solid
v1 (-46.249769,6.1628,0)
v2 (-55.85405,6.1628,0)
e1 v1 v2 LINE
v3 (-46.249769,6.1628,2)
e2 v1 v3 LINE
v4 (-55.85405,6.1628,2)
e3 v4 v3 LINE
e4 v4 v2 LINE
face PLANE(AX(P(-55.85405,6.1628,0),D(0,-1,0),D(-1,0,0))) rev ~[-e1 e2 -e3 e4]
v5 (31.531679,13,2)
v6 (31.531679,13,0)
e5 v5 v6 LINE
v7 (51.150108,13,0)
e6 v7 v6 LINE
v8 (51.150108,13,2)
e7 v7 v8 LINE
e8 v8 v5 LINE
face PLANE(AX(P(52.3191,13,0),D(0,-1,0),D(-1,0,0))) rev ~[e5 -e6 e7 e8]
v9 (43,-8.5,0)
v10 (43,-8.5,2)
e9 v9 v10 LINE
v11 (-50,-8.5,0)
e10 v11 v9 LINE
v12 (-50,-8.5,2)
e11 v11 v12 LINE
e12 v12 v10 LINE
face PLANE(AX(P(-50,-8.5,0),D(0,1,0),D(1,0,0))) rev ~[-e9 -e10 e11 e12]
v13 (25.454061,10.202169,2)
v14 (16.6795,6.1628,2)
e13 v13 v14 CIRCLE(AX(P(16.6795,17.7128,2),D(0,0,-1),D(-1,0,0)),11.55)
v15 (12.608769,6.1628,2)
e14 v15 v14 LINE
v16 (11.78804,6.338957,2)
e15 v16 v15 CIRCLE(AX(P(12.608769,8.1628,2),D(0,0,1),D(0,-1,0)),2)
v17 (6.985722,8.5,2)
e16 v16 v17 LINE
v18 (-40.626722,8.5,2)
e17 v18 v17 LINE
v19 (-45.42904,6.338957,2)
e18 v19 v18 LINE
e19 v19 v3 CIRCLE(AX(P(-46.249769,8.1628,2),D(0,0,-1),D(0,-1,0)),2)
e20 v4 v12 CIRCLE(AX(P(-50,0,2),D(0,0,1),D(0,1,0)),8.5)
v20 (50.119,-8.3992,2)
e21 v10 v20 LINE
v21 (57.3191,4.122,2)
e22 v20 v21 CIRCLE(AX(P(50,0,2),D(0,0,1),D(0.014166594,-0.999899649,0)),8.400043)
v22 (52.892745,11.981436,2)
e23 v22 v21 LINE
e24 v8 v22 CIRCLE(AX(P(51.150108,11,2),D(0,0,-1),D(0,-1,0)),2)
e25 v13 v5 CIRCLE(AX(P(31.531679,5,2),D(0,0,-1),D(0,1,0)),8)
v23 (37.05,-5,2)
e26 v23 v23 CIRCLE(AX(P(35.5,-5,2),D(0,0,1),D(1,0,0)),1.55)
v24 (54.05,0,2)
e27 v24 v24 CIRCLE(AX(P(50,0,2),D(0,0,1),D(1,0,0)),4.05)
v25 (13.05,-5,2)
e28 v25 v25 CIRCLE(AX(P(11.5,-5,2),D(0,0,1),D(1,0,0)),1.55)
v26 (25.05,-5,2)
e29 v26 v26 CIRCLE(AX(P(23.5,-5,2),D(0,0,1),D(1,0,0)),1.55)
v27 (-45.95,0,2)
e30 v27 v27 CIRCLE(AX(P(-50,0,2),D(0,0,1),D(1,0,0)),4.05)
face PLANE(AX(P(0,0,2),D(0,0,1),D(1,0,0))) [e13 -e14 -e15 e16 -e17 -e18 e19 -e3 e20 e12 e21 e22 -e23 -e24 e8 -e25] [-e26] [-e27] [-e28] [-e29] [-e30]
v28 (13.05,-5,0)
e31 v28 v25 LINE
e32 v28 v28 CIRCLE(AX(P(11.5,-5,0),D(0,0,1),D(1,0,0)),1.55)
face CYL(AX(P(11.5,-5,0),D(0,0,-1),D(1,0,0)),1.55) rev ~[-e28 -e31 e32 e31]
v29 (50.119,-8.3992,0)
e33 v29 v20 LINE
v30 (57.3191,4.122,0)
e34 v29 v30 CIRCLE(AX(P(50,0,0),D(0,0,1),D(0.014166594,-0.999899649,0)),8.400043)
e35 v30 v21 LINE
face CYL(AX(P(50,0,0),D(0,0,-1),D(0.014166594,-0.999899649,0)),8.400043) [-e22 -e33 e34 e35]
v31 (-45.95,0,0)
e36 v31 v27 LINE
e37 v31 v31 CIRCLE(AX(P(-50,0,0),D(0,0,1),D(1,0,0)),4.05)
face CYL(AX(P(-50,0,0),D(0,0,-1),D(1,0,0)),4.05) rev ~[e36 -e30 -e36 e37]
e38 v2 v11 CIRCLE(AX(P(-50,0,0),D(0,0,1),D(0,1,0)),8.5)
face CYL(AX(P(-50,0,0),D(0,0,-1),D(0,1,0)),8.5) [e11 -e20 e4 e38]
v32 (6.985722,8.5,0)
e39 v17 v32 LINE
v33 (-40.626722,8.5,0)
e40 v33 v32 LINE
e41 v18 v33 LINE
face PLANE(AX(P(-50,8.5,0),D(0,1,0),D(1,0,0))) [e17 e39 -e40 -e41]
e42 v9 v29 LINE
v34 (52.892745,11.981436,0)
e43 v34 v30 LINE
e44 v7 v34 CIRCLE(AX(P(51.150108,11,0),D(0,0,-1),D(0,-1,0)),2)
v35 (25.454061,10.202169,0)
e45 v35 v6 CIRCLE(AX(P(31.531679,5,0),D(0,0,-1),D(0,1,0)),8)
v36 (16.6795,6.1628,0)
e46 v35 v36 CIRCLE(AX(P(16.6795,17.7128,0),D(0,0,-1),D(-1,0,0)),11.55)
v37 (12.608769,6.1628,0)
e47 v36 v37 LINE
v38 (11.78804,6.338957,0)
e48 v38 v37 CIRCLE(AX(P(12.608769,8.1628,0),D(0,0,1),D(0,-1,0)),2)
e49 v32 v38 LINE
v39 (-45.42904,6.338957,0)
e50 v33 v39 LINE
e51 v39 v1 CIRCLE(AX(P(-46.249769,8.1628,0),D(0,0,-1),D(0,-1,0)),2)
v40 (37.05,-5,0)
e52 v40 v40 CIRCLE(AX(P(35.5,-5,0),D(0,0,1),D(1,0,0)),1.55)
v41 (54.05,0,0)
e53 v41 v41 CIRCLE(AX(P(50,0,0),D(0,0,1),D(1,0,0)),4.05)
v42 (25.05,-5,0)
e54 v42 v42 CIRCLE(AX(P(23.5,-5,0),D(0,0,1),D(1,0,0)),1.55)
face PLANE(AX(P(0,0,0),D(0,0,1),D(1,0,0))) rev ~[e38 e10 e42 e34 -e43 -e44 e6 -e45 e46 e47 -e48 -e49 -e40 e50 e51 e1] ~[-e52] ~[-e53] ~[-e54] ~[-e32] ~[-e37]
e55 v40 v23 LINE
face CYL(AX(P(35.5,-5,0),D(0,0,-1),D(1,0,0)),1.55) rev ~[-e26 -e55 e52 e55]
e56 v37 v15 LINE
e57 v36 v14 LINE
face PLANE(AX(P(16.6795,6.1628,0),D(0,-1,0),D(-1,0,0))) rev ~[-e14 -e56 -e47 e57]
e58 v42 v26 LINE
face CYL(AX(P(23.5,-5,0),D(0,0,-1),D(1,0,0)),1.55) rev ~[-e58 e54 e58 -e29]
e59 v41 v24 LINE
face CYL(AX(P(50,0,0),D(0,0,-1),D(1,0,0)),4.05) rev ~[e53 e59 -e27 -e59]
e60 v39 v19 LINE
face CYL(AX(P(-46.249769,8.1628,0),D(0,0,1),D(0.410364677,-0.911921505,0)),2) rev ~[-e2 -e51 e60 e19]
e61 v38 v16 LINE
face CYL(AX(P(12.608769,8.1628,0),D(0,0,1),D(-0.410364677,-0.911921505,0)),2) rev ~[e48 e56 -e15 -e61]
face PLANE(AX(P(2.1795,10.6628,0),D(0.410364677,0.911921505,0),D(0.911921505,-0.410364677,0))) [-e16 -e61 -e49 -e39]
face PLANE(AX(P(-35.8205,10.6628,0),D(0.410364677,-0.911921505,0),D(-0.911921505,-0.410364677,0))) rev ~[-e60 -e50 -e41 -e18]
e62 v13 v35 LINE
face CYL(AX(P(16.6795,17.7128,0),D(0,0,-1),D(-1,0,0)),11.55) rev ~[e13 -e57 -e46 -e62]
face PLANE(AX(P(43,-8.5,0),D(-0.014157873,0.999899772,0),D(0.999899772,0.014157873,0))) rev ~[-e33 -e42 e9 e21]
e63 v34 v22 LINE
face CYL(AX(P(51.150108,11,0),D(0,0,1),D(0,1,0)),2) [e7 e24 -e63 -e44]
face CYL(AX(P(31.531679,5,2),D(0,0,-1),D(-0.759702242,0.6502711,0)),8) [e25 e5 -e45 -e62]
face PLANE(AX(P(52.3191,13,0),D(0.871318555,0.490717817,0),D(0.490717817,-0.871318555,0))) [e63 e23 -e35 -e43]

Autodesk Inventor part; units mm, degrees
ref_plane "YZ Plane" through (0, 0, 0) normal (1, 0, 0) x (0, 1, 0)
ref_plane "XZ Plane" through (0, 0, 0) normal (0, 1, 0) x (-1, 0, 0)
ref_plane "XY Plane" through (0, 0, 0) normal (0, 0, 1) x (1, 0, 0)
sketch "スケッチ1" plane through (0, 0, 0) normal (0, 0, 1) x (1, 0, 0)
  line L0 (-50, 0) -> (50, 0) construction
  circle A0 centre (-50, 0) radius 4.05
  circle A1 centre (50, 0) radius 4.05
  line L1 (-50, 8.5) -> (43, 8.5)
  line L2 (-50, -8.5) -> (43, -8.5)
  arc A2 (-50, 8.5) -> (-50, -8.5) centre (-50, 0) ccw
  line L3 (43, -8.5) -> (50.119, -8.3992)
  line L4 (43, 8.5) -> (50.119, 8.3992)
  arc A3 (50.119, -8.3992) -> (50.119, 8.3992) centre (50, 0) ccw
  line L5 (9, -7.5) -> (38, -7.5) construction
  line L6 (38, -7.5) -> (38, -2.5) construction
  line L7 (38, -2.5) -> (9, -2.5) construction
  line L8 (9, -2.5) -> (9, -7.5) construction
  line L9 (9, -5) -> (38, -5) construction
  circle A4 centre (23.5, -5) radius 1.55
  circle A5 centre (11.5, -5) radius 1.55
  circle A6 centre (35.5, -5) radius 1.55
  line L10 (23.5, -5) -> (23.5, -2.5) construction
  line L11 (52.3191, 13) -> (22.3191, 13)
  line L12 (22.3191, 13) -> (12.3191, 8.5)
  line L13 (52.3191, 13) -> (57.3191, 4.122)
  point P0 (0, 0)
  point P1 (0, 0)
  point P2 (54.8534, 8.5)
  dimension "d0" = 100
  dimension "d1" = 8.1
  dimension "d2" = 8.5
  dimension "d8" = 8.1
  dimension "d9" = 7
  dimension "d10" = 8.4
  dimension "d12" = 5
  dimension "d13" = 29
  dimension "d14" = 3.1
  dimension "d15" = 2.5
  dimension "d17" = 13
  dimension "d19" = 10
  dimension "d20" = 30
  dimension "d25" = 12
  dimension "d26" = 5
  dimension "d45" = 1
extrude "押し出し1" add sketch "スケッチ1" along normal blind 2
fillet "フィレット1" radius 2 3 edges at (12.3191, 8.5, 1) (22.3191, 13, 1) (52.3191, 13, 1)
sketch "スケッチ2" plane through (0, 0, 0) normal (0, 0, -1) x (-1, 0, 0)
  circle A0 centre (-16.6795, 17.7128) radius 11.35 construction
  circle A1 centre (-16.6795, 17.7128) radius 11.55
  line L0 (-16.6795, 6.1628) -> (58.7547, 6.1628)
  line L1 (-16.6795, 17.7128) -> (-34, 27.7128) construction
  circle A2 centre (-50, 0) radius 4.05 projected
  line L2 (-50, 0) -> (-34, 27.7128) construction
  line L3 (50, -8.5) -> (-43, -8.5) projected
  line L4 (-2.1795, 10.6628) -> (35.8205, 10.6628)
  line L5 (35.8205, 10.6628) -> (45.8205, 6.1628)
  line L6 (-2.1795, 10.6628) -> (-12.1795, 6.1628)
  circle A3 centre (50, 0) radius 4.05 projected
  line L7 (58.7547, 6.1628) -> (-13.2236, 28.7337)
  arc A4 (50, -8.5) -> (50, 8.5) centre (50, 0) ccw projected
  point P0 (0, 0)
  dimension "d29" = 22.7
  dimension "d30" = 0.2
  dimension "d31" = 60
  dimension "d32" = 90
  dimension "d33" = 20
  dimension "d34" = 38
  dimension "d35" = 10
  dimension "d36" = 10
  dimension "d37" = 4.5
  dimension "d38" = 32
  dimension "d40" = 4.5
extrude "押し出し2" cut sketch "スケッチ2" against normal through all contours A1 | A1 L7 A4 L0 L5 L4 L6 | L7 L0 A4
fillet "フィレット2" radius 8 1 edges at (27.2242, 13, 1)
fillet "フィレット2" radius 2 2 edges at (12.1795, 6.1628, 1) (-45.8205, 6.1628, 1)
equation "\"d8\" = d1"
equation "\"d19\" = d18"
equation "\"d36\" = d35"
equation "\"d18\" = 10"
properties part number "リンク_メインフレーム_6_1" material "GFRP"
